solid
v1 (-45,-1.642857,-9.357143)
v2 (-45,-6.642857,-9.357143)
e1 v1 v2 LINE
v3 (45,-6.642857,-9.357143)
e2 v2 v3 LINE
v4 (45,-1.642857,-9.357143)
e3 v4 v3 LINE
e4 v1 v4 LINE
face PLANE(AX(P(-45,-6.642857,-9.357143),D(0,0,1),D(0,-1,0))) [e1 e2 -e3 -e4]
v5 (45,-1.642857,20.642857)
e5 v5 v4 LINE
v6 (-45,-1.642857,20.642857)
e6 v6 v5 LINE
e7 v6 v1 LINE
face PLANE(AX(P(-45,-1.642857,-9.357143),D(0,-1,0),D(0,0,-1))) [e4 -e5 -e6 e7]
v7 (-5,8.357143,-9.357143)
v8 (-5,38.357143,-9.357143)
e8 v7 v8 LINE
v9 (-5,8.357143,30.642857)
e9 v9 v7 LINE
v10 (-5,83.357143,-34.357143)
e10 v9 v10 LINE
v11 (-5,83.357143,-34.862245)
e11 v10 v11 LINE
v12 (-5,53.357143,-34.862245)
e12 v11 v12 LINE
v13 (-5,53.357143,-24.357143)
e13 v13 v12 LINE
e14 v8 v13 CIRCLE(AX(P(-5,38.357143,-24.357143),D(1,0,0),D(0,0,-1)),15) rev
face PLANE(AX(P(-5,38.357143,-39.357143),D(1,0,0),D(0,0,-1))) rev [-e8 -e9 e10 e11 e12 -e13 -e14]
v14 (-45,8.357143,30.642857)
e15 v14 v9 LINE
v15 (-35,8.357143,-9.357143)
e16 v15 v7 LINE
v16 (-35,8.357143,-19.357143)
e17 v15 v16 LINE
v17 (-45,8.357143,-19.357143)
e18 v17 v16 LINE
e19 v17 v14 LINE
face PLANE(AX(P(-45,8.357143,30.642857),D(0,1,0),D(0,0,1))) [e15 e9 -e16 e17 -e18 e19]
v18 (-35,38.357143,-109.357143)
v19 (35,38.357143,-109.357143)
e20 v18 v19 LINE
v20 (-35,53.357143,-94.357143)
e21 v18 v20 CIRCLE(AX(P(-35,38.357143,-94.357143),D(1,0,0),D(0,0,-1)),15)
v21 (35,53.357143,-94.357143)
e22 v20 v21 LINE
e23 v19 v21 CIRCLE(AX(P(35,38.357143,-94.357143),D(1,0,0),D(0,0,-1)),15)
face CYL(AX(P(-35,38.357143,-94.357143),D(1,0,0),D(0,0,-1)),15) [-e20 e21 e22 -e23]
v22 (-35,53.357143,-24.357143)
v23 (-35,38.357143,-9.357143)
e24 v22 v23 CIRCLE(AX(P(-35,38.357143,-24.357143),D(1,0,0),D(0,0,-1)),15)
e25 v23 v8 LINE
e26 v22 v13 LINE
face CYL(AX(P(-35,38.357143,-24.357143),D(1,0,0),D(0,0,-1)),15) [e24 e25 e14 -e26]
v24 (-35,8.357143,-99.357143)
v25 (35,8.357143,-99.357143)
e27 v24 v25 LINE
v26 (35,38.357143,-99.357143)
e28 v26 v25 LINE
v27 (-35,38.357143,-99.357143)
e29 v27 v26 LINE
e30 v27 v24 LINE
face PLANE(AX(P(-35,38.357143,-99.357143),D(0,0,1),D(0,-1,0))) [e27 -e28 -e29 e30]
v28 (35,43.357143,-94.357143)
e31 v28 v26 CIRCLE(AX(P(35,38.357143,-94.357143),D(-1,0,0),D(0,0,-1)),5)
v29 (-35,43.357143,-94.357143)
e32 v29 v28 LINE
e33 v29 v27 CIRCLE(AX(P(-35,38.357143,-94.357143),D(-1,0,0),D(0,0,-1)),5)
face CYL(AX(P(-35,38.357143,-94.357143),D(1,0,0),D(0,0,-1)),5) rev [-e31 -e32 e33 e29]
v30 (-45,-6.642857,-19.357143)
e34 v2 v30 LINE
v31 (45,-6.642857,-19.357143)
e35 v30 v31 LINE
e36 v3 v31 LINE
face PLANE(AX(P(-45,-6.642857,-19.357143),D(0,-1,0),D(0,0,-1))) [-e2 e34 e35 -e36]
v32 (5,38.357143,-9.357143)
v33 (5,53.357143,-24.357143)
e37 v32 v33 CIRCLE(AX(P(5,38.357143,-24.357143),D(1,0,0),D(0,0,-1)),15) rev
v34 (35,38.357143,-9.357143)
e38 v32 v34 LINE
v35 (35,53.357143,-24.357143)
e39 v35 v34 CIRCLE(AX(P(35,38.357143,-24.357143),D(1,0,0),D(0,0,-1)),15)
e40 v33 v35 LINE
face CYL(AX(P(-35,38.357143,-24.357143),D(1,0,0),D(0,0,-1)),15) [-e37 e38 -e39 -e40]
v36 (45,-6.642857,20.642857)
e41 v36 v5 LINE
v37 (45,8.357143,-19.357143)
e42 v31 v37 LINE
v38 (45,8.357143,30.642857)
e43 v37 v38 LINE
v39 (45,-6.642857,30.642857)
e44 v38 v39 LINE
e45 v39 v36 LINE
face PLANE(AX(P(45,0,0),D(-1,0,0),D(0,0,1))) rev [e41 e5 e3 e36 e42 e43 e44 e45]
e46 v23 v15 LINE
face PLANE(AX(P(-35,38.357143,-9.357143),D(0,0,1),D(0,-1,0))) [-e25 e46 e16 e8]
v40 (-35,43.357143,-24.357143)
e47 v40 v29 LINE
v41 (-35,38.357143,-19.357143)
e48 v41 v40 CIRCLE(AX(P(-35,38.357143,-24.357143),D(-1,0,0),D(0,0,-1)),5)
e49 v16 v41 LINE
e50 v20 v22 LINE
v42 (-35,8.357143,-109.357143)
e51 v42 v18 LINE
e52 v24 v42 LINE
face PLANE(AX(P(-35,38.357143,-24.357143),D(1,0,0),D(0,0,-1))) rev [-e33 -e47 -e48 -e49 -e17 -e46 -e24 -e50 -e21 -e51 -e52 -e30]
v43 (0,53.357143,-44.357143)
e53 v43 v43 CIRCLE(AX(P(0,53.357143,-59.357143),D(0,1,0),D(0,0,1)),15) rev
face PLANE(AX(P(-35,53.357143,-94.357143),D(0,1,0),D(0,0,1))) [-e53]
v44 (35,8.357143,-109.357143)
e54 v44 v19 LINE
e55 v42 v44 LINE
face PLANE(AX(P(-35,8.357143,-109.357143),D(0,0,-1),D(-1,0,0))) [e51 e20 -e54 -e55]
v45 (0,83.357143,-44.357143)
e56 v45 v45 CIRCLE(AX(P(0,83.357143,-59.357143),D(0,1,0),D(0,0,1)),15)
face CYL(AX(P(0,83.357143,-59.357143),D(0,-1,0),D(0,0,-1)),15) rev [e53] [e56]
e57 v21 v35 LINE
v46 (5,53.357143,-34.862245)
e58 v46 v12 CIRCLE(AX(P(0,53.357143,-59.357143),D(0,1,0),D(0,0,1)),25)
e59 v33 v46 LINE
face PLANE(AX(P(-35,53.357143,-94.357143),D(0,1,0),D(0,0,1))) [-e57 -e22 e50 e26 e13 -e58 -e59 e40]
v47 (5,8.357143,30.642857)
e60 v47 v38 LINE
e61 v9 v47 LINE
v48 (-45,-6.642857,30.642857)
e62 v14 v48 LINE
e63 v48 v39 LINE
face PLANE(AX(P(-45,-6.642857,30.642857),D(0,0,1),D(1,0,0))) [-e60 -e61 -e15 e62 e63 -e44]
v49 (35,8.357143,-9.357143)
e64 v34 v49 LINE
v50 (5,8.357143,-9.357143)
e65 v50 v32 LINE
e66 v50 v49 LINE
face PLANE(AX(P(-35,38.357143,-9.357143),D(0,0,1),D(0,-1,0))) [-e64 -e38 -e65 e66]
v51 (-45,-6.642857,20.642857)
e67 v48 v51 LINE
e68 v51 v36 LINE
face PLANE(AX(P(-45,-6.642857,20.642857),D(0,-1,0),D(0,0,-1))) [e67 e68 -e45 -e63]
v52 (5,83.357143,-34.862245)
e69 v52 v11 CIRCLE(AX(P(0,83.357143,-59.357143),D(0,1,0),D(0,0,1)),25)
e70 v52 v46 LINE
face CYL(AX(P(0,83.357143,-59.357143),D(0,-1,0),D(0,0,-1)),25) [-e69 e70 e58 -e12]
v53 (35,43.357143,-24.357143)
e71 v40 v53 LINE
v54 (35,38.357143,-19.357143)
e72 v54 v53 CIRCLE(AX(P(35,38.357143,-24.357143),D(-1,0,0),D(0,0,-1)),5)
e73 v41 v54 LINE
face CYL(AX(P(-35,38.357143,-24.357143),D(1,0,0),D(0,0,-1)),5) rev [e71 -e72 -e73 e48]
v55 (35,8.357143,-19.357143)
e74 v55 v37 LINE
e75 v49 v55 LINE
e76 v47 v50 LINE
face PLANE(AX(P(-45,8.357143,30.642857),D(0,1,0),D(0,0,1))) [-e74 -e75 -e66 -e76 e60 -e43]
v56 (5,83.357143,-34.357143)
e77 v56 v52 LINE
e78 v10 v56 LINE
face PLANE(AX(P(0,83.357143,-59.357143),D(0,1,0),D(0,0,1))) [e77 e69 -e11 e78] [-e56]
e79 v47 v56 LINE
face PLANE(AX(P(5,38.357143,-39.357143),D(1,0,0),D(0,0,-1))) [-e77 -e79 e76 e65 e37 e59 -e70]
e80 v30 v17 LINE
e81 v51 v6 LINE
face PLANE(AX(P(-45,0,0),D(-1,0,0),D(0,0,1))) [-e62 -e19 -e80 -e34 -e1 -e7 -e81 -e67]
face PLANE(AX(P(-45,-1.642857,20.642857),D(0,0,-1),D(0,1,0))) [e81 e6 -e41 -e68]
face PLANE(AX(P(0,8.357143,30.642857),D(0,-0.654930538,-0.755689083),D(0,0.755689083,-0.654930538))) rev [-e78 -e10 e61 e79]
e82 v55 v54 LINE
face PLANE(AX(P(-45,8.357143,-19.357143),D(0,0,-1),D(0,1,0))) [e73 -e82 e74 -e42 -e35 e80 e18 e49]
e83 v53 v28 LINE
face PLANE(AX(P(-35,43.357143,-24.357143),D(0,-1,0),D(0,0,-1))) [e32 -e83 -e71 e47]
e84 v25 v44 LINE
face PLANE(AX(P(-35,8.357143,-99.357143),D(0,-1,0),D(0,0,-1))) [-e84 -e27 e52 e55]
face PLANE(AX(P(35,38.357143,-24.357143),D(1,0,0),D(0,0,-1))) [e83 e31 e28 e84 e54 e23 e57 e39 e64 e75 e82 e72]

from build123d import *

# Parameters (mm, degrees)
BOSS_EXTRUDE1_DEPTH = 45
BOSS_EXTRUDE2_START = -10
BOSS_EXTRUDE2_DEPTH = 70
SKETCH5_R           = 25
SKETCH5_R_2         = 15
BOSS_EXTRUDE3_DEPTH = 30
RIB3_START          = -5
RIB3_DEPTH          = 10


with BuildPart() as part:
    # Sketch1 → Boss-Extrude1 (new, symmetric)
    with BuildSketch(Plane(origin=(0, 0, 0), x_dir=(0, 0, -1), z_dir=(1, 0, 0))):
        Polygon((-20.642857143, -6.642857143), (-30.642857143, -6.642857143), (-30.642857143, 8.357142857), (19.357142857, 8.357142857), (19.357142857, -6.642857143), (9.357142857, -6.642857143), (9.357142857, -1.642857143), (-20.642857143, -1.642857143), align=None)
    extrude(amount=BOSS_EXTRUDE1_DEPTH, both=True)

    # Sketch2 → Boss-Extrude2 (add)
    with BuildSketch(Plane(origin=(45, 0, 0), x_dir=(0, 0, -1), z_dir=(1, 0, 0)).offset(BOSS_EXTRUDE2_START)):
        with BuildLine():
            Line((19.357142857, 8.357142857), (19.357142857, 38.357142857))
            ThreePointArc((19.357142857, 38.357142857), (20.821608951, 41.892676763), (24.357142857, 43.357142857))
            Line((24.357142857, 43.357142857), (94.357142857, 43.357142857))
            ThreePointArc((94.357142857, 43.357142857), (97.892676763, 41.892676763), (99.357142857, 38.357142857))
            Line((99.357142857, 38.357142857), (99.357142857, 8.357142857))
            Line((99.357142857, 8.357142857), (109.357142857, 8.357142857))
            Line((109.357142857, 8.357142857), (109.357142857, 38.357142857))
            ThreePointArc((109.357142857, 38.357142857), (104.963744575, 48.963744575), (94.357142857, 53.357142857))
            Line((94.357142857, 53.357142857), (24.357142857, 53.357142857))
            ThreePointArc((24.357142857, 53.357142857), (13.750541139, 48.963744575), (9.357142857, 38.357142857))
            Line((9.357142857, 38.357142857), (9.357142857, 8.357142857))
            Line((9.357142857, 8.357142857), (19.357142857, 8.357142857))
        make_face()
    extrude(amount=-BOSS_EXTRUDE2_DEPTH)

    # Sketch5 → Boss-Extrude3 (add)
    with BuildSketch(Plane(origin=(0, 53.357142857, 0), x_dir=(1, 0, 0), z_dir=(0, 1, 0))):
        with Locations(Location((0, 59.357142857, 0), (0, 0, 270))):
            Circle(SKETCH5_R)
        with Locations(Location((0, 59.357142857, 0), (0, 0, 270))):
            Circle(SKETCH5_R_2, mode=Mode.SUBTRACT)
    extrude(amount=BOSS_EXTRUDE3_DEPTH)

    # Rib3: read off the stored shape, not the designer's step
    # Rib3 outline → Rib3 (add)
    with BuildSketch(Plane(origin=(0, 0, 0), x_dir=(0, 0, -1), z_dir=(1, 0, 0)).offset(RIB3_START)):
        with BuildLine():
            Line((34.862245429, 83.357142857), (34.357142857, 83.357142857))
            Line((34.357142857, 83.357142857), (-30.642857143, 8.357142857))
            Line((-30.642857143, 8.357142857), (9.357142857, 8.357142857))
            Line((9.357142857, 8.357142857), (9.357142857, 38.357142857))
            ThreePointArc((9.357142857, 38.357142857), (13.750541139, 48.963744575), (24.357142857, 53.357142857))
            Line((24.357142857, 53.357142857), (34.862245429, 53.357142857))
            Line((34.862245429, 53.357142857), (34.862245429, 83.357142857))
        make_face()
    extrude(amount=RIB3_DEPTH)


solid = part.part
